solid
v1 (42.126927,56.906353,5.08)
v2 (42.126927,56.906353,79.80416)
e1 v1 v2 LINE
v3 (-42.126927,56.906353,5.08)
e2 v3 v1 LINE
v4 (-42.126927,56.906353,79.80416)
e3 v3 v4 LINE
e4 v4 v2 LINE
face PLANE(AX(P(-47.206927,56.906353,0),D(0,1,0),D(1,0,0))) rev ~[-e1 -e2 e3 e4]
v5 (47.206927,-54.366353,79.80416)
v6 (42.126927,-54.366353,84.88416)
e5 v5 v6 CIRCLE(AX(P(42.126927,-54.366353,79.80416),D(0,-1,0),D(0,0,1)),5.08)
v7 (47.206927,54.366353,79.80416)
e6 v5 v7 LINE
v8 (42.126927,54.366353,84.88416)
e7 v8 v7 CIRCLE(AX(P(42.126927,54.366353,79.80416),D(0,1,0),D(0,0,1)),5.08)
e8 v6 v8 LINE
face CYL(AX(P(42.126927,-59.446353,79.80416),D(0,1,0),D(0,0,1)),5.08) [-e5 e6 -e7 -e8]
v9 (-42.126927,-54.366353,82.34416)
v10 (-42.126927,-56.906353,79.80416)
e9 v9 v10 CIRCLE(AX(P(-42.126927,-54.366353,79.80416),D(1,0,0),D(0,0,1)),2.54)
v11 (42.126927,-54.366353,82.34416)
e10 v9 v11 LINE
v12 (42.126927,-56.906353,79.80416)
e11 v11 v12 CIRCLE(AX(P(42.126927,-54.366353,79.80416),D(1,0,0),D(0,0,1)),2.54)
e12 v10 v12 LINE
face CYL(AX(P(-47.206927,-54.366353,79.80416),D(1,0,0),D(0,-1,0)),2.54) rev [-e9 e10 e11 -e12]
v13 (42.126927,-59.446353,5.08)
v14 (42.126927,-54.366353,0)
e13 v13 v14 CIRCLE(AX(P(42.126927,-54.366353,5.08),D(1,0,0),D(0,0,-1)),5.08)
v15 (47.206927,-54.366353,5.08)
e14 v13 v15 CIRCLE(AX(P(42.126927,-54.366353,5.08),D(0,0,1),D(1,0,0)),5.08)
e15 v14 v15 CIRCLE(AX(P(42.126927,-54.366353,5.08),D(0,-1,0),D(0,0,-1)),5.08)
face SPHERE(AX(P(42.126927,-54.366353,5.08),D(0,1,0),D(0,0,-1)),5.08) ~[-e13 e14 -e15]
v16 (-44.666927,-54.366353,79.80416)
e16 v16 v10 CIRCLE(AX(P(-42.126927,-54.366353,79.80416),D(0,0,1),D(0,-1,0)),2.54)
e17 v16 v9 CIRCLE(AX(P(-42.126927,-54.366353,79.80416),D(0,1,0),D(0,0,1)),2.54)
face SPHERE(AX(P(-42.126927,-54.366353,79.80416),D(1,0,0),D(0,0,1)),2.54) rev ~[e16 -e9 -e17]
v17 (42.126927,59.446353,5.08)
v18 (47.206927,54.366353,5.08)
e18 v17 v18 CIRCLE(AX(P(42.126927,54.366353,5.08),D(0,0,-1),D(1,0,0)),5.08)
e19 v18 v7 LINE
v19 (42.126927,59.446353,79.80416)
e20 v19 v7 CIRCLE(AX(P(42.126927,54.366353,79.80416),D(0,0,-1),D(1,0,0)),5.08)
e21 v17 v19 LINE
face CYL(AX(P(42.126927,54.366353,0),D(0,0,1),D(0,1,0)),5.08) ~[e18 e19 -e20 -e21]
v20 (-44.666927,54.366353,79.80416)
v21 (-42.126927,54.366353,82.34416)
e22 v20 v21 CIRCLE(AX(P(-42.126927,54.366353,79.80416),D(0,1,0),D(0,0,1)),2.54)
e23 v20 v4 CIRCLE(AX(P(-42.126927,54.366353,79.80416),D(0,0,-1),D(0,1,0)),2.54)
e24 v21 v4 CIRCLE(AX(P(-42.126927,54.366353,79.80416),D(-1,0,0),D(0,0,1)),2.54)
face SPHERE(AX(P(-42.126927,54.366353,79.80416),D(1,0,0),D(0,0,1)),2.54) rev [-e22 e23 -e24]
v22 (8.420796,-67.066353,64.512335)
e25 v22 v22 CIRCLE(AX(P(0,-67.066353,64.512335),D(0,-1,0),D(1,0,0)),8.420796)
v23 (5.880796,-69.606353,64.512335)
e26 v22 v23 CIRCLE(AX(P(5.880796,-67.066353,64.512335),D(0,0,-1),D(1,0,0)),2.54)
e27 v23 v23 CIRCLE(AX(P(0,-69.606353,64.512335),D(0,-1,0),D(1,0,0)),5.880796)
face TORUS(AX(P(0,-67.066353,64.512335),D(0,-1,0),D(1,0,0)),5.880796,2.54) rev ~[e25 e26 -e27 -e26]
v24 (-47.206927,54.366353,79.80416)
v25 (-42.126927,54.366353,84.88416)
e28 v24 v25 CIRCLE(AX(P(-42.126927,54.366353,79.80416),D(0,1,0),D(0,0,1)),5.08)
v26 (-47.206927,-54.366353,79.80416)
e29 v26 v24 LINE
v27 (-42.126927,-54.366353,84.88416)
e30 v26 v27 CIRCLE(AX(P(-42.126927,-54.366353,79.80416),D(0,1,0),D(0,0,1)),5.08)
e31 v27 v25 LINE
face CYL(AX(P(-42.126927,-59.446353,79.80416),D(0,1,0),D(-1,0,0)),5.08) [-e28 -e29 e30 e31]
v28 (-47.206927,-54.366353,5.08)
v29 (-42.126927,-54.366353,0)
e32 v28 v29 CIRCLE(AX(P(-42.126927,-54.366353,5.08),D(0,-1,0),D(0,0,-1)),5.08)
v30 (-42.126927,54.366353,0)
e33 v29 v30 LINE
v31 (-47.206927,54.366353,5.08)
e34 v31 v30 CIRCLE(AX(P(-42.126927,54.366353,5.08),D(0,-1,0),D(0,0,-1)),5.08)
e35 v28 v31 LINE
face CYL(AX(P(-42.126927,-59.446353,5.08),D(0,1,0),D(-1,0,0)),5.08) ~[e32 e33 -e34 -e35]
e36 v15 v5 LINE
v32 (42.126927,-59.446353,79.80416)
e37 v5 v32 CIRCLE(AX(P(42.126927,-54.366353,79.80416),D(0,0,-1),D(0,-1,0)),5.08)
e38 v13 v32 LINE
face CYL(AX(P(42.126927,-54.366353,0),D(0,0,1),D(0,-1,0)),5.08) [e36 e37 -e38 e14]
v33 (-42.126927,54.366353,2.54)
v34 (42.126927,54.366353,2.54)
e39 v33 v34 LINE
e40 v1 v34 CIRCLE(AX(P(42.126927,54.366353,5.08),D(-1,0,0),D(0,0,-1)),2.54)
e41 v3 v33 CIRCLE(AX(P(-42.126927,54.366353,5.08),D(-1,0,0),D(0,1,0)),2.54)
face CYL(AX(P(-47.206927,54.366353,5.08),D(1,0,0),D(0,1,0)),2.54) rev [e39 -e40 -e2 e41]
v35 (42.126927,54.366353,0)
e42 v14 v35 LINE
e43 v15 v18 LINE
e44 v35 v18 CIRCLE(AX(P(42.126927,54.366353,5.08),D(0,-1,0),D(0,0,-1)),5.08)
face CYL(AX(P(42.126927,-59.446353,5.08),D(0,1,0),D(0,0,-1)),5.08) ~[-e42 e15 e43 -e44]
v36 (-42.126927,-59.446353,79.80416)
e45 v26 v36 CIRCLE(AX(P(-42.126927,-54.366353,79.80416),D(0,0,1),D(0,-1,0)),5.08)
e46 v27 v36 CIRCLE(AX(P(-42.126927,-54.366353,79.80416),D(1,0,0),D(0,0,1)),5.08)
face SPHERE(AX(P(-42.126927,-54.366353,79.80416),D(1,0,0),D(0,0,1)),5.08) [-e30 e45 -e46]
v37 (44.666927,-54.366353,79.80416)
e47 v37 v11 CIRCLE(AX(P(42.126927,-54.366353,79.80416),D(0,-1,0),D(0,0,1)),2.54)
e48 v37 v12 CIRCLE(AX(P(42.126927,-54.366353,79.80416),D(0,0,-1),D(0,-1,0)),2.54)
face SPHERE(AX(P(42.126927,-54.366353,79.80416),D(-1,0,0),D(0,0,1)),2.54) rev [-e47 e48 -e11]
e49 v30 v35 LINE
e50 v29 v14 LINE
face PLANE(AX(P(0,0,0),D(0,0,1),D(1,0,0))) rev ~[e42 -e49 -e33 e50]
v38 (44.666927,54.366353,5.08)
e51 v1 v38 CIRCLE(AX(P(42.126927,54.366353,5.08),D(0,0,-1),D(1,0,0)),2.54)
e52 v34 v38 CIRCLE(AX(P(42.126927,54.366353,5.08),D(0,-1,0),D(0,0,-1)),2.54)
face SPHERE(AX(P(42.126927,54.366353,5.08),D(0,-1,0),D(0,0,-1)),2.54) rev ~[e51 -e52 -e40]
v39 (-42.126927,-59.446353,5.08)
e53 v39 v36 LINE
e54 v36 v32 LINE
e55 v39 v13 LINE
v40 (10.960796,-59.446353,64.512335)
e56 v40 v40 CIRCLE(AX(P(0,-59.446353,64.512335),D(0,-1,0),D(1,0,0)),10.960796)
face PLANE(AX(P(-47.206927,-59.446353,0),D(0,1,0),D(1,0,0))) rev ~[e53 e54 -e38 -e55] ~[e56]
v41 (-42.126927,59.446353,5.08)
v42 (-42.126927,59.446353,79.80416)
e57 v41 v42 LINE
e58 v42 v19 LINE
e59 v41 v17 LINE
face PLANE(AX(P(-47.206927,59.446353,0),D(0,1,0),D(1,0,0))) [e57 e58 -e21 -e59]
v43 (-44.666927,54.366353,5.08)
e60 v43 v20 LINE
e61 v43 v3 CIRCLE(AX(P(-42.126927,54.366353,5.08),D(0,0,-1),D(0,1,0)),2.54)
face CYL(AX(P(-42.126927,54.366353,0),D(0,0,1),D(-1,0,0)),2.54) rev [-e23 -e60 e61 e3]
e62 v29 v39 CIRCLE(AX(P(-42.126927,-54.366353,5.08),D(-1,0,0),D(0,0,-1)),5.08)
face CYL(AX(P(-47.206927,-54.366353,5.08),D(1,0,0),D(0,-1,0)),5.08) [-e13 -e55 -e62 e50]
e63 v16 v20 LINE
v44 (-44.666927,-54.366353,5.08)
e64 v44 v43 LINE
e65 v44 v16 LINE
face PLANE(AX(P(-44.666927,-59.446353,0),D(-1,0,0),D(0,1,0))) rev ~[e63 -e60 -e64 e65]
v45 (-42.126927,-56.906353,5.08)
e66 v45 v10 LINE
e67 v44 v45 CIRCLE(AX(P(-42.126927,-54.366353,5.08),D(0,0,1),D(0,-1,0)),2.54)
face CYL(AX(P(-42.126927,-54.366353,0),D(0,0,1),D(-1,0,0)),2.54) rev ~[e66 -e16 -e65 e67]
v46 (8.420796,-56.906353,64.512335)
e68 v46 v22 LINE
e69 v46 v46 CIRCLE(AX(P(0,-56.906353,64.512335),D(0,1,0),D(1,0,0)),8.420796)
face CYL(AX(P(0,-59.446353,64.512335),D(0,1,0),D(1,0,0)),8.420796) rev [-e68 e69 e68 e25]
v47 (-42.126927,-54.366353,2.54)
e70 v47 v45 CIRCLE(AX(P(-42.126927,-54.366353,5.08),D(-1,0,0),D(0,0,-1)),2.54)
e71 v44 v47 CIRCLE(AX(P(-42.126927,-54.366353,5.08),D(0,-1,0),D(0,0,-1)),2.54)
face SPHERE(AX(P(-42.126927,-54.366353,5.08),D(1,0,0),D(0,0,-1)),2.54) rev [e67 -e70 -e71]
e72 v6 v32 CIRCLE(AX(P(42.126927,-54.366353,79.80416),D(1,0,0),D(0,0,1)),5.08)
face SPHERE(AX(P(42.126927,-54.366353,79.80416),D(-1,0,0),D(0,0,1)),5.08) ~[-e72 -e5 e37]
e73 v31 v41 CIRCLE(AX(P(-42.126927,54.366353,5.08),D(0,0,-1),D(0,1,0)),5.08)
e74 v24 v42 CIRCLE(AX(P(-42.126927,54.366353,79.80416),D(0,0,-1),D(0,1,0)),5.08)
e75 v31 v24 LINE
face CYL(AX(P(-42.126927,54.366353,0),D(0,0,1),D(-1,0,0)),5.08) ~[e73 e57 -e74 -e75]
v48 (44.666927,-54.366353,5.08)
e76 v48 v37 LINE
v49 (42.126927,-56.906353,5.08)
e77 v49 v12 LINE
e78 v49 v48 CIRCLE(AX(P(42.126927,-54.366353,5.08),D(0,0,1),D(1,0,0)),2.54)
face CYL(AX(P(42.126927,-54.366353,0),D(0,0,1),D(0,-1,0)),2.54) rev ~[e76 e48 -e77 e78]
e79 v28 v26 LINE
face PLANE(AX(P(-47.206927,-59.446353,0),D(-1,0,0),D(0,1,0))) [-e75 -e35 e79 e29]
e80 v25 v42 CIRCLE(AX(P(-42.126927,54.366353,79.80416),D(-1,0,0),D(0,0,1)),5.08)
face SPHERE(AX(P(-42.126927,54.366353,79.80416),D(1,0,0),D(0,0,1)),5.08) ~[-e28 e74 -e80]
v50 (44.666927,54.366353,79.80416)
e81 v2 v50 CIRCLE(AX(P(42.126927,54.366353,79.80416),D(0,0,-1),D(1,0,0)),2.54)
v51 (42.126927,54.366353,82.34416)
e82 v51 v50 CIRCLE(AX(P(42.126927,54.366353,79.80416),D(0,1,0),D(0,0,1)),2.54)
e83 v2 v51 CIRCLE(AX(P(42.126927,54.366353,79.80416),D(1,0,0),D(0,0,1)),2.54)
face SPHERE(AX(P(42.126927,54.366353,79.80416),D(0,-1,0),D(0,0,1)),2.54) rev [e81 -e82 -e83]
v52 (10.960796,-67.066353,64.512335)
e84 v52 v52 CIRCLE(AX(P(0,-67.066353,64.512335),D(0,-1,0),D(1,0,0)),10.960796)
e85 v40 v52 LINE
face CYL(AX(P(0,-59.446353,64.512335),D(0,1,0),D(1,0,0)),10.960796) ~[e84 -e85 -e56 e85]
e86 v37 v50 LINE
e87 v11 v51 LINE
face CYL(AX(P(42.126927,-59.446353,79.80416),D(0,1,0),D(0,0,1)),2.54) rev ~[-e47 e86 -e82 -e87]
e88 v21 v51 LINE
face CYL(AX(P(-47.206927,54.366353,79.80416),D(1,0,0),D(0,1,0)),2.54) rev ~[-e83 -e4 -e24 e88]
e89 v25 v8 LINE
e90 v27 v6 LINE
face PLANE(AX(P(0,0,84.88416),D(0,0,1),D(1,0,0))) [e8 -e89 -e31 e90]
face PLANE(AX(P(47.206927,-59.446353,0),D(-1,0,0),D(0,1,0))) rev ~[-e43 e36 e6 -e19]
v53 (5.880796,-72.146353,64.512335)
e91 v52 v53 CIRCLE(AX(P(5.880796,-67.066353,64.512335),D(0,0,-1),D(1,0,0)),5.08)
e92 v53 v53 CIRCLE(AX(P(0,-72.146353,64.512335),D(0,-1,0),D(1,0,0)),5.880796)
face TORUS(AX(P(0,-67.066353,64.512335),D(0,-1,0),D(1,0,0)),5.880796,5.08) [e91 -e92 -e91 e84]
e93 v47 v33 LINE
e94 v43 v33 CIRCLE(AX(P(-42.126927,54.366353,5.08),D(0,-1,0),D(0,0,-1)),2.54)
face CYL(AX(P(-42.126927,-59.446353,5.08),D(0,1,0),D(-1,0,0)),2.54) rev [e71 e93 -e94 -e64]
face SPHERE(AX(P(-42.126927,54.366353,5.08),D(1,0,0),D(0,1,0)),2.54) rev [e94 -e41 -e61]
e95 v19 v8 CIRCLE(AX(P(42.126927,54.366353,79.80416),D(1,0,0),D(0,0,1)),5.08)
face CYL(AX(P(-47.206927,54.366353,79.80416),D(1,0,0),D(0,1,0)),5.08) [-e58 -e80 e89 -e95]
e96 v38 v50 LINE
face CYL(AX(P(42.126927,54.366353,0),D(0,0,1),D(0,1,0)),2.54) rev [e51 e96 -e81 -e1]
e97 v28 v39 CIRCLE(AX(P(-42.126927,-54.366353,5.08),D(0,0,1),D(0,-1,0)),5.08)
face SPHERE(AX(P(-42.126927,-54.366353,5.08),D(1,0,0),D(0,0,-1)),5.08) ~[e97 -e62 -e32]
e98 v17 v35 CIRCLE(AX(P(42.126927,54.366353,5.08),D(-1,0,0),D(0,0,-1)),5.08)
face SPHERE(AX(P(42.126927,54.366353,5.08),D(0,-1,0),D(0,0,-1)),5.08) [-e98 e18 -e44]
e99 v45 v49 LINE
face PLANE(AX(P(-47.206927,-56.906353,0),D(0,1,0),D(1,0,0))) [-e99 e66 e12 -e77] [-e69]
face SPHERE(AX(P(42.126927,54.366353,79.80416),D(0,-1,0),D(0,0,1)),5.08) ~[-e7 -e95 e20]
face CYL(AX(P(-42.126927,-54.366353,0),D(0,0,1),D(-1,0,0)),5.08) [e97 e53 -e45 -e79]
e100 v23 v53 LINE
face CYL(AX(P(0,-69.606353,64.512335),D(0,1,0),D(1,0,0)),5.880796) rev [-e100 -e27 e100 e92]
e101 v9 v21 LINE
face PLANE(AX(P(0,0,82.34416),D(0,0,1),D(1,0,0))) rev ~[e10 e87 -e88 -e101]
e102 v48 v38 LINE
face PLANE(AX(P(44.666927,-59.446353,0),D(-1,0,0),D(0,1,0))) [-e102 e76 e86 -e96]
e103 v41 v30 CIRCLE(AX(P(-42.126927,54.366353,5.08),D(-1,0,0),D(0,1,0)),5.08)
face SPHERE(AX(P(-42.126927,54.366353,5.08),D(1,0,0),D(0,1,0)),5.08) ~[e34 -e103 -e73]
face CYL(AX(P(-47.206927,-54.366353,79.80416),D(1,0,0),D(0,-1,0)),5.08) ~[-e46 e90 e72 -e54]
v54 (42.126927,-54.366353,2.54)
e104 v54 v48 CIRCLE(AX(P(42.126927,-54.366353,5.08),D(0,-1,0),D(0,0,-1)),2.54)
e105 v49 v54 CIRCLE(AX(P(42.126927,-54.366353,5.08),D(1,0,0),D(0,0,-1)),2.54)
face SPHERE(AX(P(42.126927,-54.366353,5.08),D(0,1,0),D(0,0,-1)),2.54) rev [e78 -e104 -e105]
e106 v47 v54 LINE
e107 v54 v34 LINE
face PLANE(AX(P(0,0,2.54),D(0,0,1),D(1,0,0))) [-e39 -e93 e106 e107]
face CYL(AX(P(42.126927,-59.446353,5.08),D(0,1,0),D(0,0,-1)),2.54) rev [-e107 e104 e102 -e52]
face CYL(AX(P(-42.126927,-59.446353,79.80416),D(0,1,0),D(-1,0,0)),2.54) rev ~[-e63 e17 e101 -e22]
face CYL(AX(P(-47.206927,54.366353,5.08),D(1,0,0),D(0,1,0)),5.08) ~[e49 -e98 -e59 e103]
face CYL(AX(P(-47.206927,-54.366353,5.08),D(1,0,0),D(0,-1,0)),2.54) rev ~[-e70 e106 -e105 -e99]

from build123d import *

# Parameters (mm, degrees)
F0_W     = 94.4138541818
F0_H     = 118.8927069306
F1_DEPTH = 84.88416
F2_R     = 10.9607963201
F3_DEPTH = 12.7
F4_R     = 5.08
F5_T     = -2.54


# Not quite as in the source:
# - a shell that OpenCascade refuses in one call is made with other operations: the cavity is built on its own and cut out


with BuildPart() as f1:
    # F0 (on Top) → F1 (new body)
    with BuildSketch(Plane.XY):
        Rectangle(F0_W, F0_H)
    extrude(amount=F1_DEPTH)

    # F2 (on face) → F3 (join)
    with BuildSketch(Plane.XZ.offset(59.4463534653)):
        with Locations((0, 64.512334764)):
            Circle(F2_R)
    extrude(amount=F3_DEPTH)

    # F4
    f4_edges = [f1.edges().sort_by_distance(p)[0] for p in [
        (0, -59.446353, 84.88416),
        (47.206927, 0, 84.88416),
        (47.206927, 0, 0),
        (0, -59.446353, 0),
        (0, 59.446353, 84.88416),
        (-47.206927, 0, 84.88416),
        (0, 59.446353, 0),
        (47.206927, 59.446353, 42.44208),
        (47.206927, -59.446353, 42.44208),
        (-47.206927, 59.446353, 42.44208),
        (-47.206927, 0, 0),
        (-47.206927, -59.446353, 42.44208),
        (-10.960796, -72.146353, 64.512335),
    ]]
    fillet(f4_edges, radius=F4_R)

    # F5: a shell. OpenCascade refuses it in one call, so the cavity is built on its own and cut out:
    # the body offset inwards by the wall thickness, plus a prism from it out through each open face.
    f5_core = offset(f1.part, amount=F5_T, kind=Kind.INTERSECTION, mode=Mode.PRIVATE)
    f5_exits = [f5_core.faces().sort_by_distance(p)[0] for p in [
        (0, -69.606353, 64.512335),
    ]]
    add(f5_core, mode=Mode.SUBTRACT)
    extrude(f5_exits, amount=-F5_T, mode=Mode.SUBTRACT)


solid = f1.part
